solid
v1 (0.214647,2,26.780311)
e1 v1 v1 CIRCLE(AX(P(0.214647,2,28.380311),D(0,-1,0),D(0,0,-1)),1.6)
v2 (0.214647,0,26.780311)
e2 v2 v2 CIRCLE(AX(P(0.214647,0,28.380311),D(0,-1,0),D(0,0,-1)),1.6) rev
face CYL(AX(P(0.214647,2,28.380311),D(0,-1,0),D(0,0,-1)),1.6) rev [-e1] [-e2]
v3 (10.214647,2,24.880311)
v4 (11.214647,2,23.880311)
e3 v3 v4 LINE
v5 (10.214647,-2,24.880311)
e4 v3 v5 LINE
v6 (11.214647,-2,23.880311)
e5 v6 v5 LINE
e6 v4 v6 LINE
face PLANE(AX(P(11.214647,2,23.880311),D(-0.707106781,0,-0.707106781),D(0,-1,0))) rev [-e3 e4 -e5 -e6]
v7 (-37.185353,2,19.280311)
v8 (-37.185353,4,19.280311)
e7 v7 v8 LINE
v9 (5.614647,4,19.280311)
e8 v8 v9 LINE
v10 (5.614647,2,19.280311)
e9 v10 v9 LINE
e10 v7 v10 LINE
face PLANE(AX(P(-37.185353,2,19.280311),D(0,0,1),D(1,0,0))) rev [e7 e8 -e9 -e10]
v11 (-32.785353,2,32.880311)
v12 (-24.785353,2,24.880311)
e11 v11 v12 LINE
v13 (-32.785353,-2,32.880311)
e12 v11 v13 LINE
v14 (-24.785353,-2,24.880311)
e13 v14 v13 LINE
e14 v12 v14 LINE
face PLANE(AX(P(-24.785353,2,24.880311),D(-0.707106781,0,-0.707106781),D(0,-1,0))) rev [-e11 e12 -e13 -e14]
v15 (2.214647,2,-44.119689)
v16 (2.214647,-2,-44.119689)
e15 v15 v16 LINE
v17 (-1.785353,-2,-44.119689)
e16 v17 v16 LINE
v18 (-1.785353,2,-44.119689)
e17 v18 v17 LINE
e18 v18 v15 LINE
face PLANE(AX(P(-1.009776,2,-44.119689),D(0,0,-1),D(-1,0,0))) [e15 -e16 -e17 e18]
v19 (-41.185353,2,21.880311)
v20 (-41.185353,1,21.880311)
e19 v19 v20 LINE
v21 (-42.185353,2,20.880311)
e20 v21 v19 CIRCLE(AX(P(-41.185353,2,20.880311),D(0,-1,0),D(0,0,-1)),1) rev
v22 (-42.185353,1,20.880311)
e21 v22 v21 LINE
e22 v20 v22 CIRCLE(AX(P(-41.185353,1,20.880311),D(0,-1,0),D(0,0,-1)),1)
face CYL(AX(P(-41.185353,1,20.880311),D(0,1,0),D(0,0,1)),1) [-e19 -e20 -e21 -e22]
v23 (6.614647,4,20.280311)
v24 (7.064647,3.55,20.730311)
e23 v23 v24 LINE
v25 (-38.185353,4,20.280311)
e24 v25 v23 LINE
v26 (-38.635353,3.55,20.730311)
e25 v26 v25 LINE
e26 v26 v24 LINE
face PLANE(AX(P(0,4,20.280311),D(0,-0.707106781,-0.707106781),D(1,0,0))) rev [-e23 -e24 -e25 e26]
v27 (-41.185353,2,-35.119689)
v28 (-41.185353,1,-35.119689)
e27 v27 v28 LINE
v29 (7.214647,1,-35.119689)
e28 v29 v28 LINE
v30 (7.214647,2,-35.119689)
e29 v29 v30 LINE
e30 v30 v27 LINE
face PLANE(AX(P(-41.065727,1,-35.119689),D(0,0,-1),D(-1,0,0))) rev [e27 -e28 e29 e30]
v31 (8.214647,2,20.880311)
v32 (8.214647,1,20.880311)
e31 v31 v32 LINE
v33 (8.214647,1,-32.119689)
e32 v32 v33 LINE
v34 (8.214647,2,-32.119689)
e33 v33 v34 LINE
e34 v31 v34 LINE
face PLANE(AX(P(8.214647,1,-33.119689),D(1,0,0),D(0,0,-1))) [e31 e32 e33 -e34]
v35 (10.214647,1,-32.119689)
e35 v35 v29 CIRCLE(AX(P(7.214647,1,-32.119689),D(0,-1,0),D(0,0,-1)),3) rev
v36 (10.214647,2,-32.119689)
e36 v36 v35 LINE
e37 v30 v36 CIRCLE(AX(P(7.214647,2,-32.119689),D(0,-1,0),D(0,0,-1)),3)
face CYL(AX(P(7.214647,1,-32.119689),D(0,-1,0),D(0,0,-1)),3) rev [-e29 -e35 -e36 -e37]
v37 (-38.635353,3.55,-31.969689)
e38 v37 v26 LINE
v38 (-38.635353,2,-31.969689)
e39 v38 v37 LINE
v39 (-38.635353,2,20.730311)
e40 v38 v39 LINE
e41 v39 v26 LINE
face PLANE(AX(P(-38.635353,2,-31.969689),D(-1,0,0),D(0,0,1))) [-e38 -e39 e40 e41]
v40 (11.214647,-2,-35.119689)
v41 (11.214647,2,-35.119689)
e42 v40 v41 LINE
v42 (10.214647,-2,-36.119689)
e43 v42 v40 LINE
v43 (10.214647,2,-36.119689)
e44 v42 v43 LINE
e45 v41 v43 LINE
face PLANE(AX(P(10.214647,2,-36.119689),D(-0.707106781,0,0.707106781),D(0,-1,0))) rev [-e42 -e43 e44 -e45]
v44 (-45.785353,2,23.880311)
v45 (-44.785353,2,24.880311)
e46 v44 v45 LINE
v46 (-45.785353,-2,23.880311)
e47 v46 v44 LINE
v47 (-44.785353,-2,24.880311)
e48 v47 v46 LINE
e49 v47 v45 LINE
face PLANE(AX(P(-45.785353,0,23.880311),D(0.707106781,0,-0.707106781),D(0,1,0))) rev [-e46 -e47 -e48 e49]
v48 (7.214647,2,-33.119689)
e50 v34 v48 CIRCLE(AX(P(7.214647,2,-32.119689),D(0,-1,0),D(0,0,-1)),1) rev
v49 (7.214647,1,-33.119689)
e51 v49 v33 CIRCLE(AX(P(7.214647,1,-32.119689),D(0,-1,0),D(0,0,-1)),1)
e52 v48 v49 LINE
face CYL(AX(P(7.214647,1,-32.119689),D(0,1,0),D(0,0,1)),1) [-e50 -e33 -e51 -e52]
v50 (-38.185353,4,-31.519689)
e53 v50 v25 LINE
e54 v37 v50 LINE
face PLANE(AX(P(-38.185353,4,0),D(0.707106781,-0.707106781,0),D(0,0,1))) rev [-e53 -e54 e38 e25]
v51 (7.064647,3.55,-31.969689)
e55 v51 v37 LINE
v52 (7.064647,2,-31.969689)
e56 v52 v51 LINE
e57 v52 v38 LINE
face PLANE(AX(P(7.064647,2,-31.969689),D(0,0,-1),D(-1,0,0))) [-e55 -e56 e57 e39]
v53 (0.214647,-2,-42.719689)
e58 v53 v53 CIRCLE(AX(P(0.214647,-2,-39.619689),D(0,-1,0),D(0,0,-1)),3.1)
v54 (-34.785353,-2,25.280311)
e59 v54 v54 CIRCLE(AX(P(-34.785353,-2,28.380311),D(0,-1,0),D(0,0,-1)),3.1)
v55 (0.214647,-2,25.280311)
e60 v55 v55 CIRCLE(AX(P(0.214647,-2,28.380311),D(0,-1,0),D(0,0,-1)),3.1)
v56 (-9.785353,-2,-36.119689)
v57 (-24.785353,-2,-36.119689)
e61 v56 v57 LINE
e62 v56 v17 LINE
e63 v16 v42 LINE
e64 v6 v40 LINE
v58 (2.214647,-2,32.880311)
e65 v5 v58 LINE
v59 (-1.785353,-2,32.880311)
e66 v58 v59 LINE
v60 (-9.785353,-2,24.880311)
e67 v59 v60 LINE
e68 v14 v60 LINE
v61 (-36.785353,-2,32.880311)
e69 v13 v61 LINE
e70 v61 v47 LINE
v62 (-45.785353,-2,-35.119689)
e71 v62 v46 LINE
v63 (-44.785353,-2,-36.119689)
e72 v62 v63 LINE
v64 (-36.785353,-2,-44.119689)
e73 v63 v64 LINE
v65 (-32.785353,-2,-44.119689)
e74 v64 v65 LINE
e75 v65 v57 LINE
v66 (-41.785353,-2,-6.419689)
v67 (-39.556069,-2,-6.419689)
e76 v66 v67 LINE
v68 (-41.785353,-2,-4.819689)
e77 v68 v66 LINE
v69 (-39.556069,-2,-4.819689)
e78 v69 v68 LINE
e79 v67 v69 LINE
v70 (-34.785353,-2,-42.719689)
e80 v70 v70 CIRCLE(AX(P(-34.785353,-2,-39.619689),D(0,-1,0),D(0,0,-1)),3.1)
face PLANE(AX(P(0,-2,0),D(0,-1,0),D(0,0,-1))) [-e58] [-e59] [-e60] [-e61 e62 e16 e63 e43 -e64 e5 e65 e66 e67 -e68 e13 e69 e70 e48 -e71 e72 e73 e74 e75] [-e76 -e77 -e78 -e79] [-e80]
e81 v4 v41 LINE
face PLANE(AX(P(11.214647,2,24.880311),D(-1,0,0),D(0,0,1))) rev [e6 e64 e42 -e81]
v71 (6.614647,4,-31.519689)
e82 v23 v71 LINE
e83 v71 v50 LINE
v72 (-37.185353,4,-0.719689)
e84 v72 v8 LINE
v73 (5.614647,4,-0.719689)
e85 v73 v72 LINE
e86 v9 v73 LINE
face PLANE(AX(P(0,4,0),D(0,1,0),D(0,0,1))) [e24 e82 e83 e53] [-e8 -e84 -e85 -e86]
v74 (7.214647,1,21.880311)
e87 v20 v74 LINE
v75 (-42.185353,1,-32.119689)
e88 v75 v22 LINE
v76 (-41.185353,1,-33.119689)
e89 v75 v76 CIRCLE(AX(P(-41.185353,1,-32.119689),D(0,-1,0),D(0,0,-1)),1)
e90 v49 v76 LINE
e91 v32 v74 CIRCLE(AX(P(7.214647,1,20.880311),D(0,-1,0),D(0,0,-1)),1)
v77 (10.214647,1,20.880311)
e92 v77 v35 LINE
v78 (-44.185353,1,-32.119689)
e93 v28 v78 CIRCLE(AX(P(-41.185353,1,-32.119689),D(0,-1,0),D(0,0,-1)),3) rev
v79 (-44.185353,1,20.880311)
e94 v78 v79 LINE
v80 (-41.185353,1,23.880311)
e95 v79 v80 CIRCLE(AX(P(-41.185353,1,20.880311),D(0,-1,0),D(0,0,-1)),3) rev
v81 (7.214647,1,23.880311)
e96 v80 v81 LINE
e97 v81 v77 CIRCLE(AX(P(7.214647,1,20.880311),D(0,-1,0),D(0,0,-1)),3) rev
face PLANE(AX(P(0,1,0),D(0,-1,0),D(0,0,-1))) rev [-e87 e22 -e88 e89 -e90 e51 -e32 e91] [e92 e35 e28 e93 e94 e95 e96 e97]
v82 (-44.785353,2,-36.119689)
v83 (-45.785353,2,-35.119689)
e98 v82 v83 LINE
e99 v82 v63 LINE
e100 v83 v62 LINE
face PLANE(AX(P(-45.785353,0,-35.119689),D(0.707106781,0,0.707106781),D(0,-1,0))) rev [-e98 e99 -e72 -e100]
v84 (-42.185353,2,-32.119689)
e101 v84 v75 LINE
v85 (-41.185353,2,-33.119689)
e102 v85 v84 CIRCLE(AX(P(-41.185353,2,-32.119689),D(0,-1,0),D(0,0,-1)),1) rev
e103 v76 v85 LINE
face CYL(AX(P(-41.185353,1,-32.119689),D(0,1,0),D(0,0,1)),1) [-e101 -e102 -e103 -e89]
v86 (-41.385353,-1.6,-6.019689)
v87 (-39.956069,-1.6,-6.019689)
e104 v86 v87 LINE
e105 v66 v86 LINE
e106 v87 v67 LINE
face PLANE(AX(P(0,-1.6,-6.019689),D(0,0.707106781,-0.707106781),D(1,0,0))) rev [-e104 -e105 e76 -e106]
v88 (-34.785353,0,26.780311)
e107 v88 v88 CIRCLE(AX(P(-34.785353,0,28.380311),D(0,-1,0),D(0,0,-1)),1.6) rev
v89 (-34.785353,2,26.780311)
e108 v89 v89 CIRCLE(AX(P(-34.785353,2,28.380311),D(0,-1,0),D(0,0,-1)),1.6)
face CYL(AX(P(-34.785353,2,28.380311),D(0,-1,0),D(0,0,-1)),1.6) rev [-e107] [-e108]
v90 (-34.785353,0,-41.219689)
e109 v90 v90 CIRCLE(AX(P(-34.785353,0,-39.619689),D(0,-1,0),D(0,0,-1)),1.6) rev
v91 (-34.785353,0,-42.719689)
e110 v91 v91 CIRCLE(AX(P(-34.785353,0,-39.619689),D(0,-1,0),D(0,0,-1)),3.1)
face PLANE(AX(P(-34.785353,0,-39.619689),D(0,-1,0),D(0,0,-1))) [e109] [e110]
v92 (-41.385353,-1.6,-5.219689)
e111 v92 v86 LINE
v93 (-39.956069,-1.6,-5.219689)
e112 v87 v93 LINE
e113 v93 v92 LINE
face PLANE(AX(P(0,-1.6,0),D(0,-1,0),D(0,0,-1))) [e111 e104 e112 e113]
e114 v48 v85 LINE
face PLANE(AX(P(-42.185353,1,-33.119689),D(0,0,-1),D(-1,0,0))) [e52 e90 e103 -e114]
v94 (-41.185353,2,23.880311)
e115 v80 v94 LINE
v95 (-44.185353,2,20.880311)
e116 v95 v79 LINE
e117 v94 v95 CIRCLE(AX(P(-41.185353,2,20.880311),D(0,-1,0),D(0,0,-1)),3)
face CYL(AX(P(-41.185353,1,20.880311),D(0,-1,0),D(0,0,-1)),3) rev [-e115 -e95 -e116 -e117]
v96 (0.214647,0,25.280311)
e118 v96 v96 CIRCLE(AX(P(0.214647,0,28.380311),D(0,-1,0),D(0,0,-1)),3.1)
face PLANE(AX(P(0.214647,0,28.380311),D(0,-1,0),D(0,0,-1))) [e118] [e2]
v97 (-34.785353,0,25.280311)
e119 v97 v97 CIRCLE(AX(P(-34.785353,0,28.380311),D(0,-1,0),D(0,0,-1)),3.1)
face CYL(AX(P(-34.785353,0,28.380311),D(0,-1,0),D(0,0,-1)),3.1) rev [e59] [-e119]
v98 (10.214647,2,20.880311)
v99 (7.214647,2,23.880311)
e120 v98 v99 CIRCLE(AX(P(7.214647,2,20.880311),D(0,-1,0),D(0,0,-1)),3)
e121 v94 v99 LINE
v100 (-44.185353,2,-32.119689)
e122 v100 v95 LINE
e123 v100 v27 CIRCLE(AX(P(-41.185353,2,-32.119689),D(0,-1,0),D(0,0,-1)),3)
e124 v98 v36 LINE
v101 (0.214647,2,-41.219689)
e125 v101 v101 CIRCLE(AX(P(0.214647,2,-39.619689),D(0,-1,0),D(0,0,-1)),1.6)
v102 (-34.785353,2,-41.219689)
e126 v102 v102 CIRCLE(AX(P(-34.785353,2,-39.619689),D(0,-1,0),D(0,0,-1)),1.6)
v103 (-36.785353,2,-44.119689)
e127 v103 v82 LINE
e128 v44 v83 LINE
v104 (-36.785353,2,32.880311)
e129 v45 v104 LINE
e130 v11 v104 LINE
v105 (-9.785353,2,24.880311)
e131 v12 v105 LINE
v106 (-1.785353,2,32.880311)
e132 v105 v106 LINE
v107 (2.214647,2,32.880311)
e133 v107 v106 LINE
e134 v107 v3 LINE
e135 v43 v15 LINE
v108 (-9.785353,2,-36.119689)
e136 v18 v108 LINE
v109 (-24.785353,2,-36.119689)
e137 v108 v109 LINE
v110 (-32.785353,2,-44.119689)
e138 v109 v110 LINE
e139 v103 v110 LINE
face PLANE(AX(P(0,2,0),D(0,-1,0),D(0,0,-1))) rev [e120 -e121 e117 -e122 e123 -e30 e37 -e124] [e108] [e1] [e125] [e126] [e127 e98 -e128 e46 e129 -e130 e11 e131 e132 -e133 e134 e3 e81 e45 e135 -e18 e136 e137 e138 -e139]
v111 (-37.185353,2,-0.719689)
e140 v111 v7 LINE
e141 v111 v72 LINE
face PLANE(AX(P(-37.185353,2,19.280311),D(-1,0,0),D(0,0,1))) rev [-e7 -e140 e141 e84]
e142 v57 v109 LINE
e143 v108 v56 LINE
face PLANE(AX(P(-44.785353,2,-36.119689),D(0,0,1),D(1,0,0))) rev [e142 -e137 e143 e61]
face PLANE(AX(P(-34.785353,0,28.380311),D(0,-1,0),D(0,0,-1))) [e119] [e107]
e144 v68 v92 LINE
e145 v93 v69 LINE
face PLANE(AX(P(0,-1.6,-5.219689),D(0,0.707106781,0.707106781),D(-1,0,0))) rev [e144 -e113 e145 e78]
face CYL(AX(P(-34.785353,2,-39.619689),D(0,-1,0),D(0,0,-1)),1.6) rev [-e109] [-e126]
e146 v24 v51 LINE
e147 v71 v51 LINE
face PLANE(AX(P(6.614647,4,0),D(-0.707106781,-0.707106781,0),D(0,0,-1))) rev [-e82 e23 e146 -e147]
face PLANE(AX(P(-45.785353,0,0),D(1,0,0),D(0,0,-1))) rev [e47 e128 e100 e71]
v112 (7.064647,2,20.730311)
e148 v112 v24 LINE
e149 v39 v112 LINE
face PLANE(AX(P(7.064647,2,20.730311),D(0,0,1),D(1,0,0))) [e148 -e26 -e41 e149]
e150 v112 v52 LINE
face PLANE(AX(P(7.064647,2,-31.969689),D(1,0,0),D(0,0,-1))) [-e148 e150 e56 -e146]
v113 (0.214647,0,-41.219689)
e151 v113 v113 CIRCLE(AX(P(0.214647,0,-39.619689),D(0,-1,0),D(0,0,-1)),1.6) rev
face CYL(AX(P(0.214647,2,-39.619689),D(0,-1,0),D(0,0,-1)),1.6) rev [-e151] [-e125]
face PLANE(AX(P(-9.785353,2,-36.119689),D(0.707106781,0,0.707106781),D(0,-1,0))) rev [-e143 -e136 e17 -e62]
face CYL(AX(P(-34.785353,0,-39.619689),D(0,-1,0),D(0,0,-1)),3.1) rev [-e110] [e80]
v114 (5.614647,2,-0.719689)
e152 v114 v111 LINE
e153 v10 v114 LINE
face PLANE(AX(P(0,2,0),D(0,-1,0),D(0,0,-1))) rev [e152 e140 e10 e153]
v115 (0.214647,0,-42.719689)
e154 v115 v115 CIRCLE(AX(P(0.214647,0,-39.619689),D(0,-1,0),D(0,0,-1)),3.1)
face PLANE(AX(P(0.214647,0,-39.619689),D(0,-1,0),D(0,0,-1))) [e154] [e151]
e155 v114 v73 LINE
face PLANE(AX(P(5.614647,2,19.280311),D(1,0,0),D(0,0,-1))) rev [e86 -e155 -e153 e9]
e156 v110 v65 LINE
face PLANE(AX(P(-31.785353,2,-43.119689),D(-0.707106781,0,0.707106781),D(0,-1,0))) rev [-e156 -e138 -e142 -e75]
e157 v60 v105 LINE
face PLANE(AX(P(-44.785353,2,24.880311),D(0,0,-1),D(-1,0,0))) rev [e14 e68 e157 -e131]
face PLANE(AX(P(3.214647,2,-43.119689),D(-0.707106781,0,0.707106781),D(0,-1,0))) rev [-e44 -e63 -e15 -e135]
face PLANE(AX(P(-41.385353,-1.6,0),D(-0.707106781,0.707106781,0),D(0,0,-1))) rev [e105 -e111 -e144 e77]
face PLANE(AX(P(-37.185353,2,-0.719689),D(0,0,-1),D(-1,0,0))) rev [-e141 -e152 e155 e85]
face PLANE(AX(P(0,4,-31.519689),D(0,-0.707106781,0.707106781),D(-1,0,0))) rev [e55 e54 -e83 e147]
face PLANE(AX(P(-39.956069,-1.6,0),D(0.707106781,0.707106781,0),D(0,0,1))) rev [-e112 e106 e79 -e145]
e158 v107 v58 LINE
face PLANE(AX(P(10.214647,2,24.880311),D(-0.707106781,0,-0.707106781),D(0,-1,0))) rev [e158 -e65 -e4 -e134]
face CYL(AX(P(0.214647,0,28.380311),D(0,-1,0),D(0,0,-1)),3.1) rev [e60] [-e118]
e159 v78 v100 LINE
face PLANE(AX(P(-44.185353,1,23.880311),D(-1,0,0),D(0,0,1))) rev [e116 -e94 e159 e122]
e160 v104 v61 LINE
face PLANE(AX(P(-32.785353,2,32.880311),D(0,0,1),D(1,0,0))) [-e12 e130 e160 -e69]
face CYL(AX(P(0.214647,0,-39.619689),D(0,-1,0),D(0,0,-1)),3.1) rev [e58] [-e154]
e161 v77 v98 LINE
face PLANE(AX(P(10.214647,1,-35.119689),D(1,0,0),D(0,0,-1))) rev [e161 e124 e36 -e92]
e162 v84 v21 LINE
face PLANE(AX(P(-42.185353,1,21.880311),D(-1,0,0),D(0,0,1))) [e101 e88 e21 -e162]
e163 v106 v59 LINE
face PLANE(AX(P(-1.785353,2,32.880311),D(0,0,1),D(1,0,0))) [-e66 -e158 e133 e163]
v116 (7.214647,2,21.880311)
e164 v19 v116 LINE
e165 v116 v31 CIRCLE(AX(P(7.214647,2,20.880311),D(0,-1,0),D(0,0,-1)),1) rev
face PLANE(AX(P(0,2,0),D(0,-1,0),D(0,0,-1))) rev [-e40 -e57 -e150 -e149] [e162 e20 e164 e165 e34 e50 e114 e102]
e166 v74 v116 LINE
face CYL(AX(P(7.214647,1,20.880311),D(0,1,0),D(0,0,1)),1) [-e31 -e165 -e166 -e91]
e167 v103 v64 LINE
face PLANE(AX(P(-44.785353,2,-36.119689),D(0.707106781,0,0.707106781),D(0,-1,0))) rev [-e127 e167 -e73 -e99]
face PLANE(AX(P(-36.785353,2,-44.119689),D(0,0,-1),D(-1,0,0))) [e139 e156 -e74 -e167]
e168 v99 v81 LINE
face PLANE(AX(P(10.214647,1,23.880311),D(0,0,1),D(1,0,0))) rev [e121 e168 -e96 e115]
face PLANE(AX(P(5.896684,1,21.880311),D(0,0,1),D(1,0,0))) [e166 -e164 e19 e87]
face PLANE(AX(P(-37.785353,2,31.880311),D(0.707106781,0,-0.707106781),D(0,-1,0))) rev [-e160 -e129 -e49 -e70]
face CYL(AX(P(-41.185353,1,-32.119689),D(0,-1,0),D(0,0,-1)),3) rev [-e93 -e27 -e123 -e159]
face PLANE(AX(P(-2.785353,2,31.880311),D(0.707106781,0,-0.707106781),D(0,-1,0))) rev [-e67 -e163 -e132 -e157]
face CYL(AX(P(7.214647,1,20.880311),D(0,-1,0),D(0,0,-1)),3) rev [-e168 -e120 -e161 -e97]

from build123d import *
from build123d.topology import SkipClean

# Parameters (mm, degrees)
SKETCH2_W           = 56
SKETCH2_H           = 61
BOSS_EXTRUDE1_DEPTH = 2
SKETCH3_W           = 46
SKETCH3_H           = 53
BOSS_EXTRUDE4_DEPTH = 2
SKETCH4_W           = 61
SKETCH4_H           = 4
BOSS_EXTRUDE5_DEPTH = 1
SKETCH5_W           = 6
SKETCH5_H           = 7
SKETCH5_R           = 1.6
BOSS_EXTRUDE7_DEPTH = 4
CUT_EXTRUDE1_DEPTH  = 1
CHAMFER1_SIZE       = 7
CHAMFER2_SIZE       = 7
CHAMFER3_SIZE       = 7
SKETCH11_R          = 3.1
CUT_EXTRUDE3_DEPTH  = 2
CHAMFER5_SIZE       = 1
BOSS_EXTRUDE8_DEPTH = 4
SKETCH13_W          = 45.8
SKETCH13_H          = 52.8
CUT_EXTRUDE4_DEPTH  = 2
CHAMFER6_SIZE       = 0.5
SKETCH14_W          = 2.229283504
SKETCH14_H          = 1.6
CUT_EXTRUDE5_DEPTH  = 0.4
CHAMFER7_SIZE       = 0.4
SKETCH15_W          = 42.8
SKETCH15_H          = 20
CUT_EXTRUDE6_DEPTH  = 2
SKETCH17_W          = 105.377924995
SKETCH17_H          = 90.385080266
SKETCH17_W_2        = 45.7
SKETCH17_H_2        = 52.7
CUT_EXTRUDE7_DEPTH  = 2
FILLET1_R           = 3
FILLET2_R           = 1


with BuildPart() as part:
    # Sketch2 → Boss-Extrude1 (new, symmetric)
    with BuildSketch(Plane(origin=(0, 0, 0), x_dir=(1, 0, 0), z_dir=(0, 1, 0))):
        with Locations((-16.78535262, 5.61968945)):
            Rectangle(SKETCH2_W, SKETCH2_H)
    extrude(amount=BOSS_EXTRUDE1_DEPTH, both=True)

    # Sketch3 → Boss-Extrude4 (add)
    with BuildSketch(Plane(origin=(0, 2, 0), x_dir=(1, 0, 0), z_dir=(0, 1, 0))):
        with Locations((-15.78535262, 5.61968945)):
            Rectangle(SKETCH3_W, SKETCH3_H)
    extrude(amount=BOSS_EXTRUDE4_DEPTH)

    # Sketch4 → Boss-Extrude5 (add)
    with BuildSketch(Plane.ZY.offset(44.78535262)):
        with Locations((-5.61968945, 0)):
            Rectangle(SKETCH4_W, SKETCH4_H)
    extrude(amount=BOSS_EXTRUDE5_DEPTH)

    # Sketch5 → Boss-Extrude7 (add)
    # profile 1 of 4: a face of its own
    with BuildSketch(Plane.XZ.offset(2)):
        with Locations((0.21464738, -39.61968945)):
            Rectangle(SKETCH5_W, SKETCH5_H)
        with Locations(Location((0.21464738, -39.61968945, 0), (0, 0, 270))):
            Circle(SKETCH5_R, mode=Mode.SUBTRACT)
    # profile 2 of 4: a face of its own
    with BuildSketch(Plane.XZ.offset(2)):
        with Locations((-34.78535262, -39.61968945)):
            Rectangle(SKETCH5_W, SKETCH5_H)
        with Locations(Location((-34.78535262, -39.61968945, 0), (0, 0, 270))):
            Circle(SKETCH5_R, mode=Mode.SUBTRACT)
    # profile 3 of 4: a face of its own
    with BuildSketch(Plane.XZ.offset(2)):
        with Locations((0.21464738, 28.38031055)):
            Rectangle(SKETCH5_W, SKETCH5_H)
        with Locations(Location((0.21464738, 28.38031055, 0), (0, 0, 270))):
            Circle(SKETCH5_R, mode=Mode.SUBTRACT)
    # profile 4 of 4: a face of its own
    with BuildSketch(Plane.XZ.offset(2)):
        with Locations((-34.78535262, 28.38031055)):
            Rectangle(SKETCH5_W, SKETCH5_H)
        with Locations(Location((-34.78535262, 28.38031055, 0), (0, 0, 270))):
            Circle(SKETCH5_R, mode=Mode.SUBTRACT)
    extrude(amount=-BOSS_EXTRUDE7_DEPTH)

    # Sketch10 → Cut-Extrude1 (cut)
    with BuildSketch(Plane(origin=(0, 2, 0), x_dir=(1, 0, 0), z_dir=(0, 1, 0))):
        Polygon((6.144593809, -23.88031055), (7.179875028, -23.88031055), (10.21464738, -23.88031055), (10.21464738, 33.074495481), (10.21464738, 35.11968945), (-41.065727012, 35.11968945), (-44.18535262, 35.11968945), (-44.18535262, -21.426384345), (-44.18535262, -23.88031055), align=None)
        Polygon((5.896683614, -21.88031055), (-42.18535262, -21.88031055), (-42.18535262, 33.11968945), (8.21464738, 33.11968945), (8.21464738, -21.88031055), align=None, mode=Mode.SUBTRACT)
    extrude(amount=-CUT_EXTRUDE1_DEPTH, mode=Mode.SUBTRACT)

    # Chamfer1
    chamfer1_edges = [part.edges().sort_by_distance(p)[0] for p in [
        (3.21464738, 0, -36.11968945),
    ]]
    chamfer(chamfer1_edges, length=CHAMFER1_SIZE - 0.0001)  # a hair under: the kernel refuses the full size

    # Chamfer2
    chamfer2_edges = [part.edges().sort_by_distance(p)[0] for p in [
        (-2.78535262, 0, -36.11968945),
    ]]
    chamfer(chamfer2_edges, length=CHAMFER2_SIZE - 0.0001)  # a hair under: the kernel refuses the full size

    # Chamfer3
    chamfer3_edges = [part.edges().sort_by_distance(p)[0] for p in [
        (-37.78535262, 0, -36.11968945),
        (-31.78535262, 0, -36.11968945),
        (3.21464738, 0, 24.88031055),
        (-2.78535262, 0, 24.88031055),
        (-37.78535262, 0, 24.88031055),
        (-31.78535262, 0, 24.88031055),
    ]]
    chamfer(chamfer3_edges, length=CHAMFER3_SIZE - 0.0001)  # a hair under: the kernel refuses the full size

    # Sketch11 → Cut-Extrude3 (cut)
    with BuildSketch(Plane.XZ.offset(2)):
        with Locations(Location((-34.78535262, 28.38031055, 0), (0, 0, 270))):
            Circle(SKETCH11_R)
        with Locations(Location((0.21464738, 28.38031055, 0), (0, 0, 270))):
            Circle(SKETCH11_R)
        with Locations(Location((0.21464738, -39.61968945, 0), (0, 0, 270))):
            Circle(SKETCH11_R)
        with Locations(Location((-34.78535262, -39.61968945, 0), (0, 0, 270))):
            Circle(SKETCH11_R)
    extrude(amount=-CUT_EXTRUDE3_DEPTH, mode=Mode.SUBTRACT)

    # Chamfer5
    chamfer5_edges = [part.edges().sort_by_distance(p)[0] for p in [
        (-45.78535262, 0, -36.11968945),
        (-45.78535262, 0, 24.88031055),
        (11.21464738, 0, -36.11968945),
        (11.21464738, 0, 24.88031055),
    ]]
    chamfer(chamfer5_edges, length=CHAMFER5_SIZE)

    # Sketch12 → Boss-Extrude8 (add)
    with SkipClean():  # the faces are left unmerged after this step: merging them gives an invalid solid
        with BuildSketch(Plane.XZ.offset(2)):
            Polygon((-31.78535262, 31.88031055), (-32.78535262, 32.88031055), (-36.78535262, 32.88031055), (-37.78535262, 31.88031055), align=None)
            Polygon((3.21464738, 31.88031055), (2.21464738, 32.88031055), (-1.78535262, 32.88031055), (-2.78535262, 31.88031055), align=None)
            Polygon((-2.78535262, -43.11968945), (-1.78535262, -44.11968945), (-1.009776474, -44.11968945), (2.21464738, -44.11968945), (3.21464738, -43.11968945), align=None)
            Polygon((-31.78535262, -43.11968945), (-32.78535262, -44.11968945), (-36.78535262, -44.11968945), (-37.78535262, -43.11968945), align=None)
        extrude(amount=-BOSS_EXTRUDE8_DEPTH)

    # Sketch13 → Cut-Extrude4 (cut)
    with SkipClean():  # the faces are left unmerged after this step: merging them gives an invalid solid
        with BuildSketch(Plane(origin=(0, 4, 0), x_dir=(1, 0, 0), z_dir=(0, 1, 0))):
            Polygon((-38.78535262, -20.88031055), (-38.68535262, -20.88031055), (7.21464738, -20.88031055), (7.21464738, -20.78031055), (7.21464738, 32.01968945), (7.21464738, 32.11968945), (-38.68535262, 32.11968945), (-38.78535262, 32.11968945), align=None)
            with Locations((-15.78535262, 5.61968945)):
                Rectangle(SKETCH13_W, SKETCH13_H, mode=Mode.SUBTRACT)
        extrude(amount=-CUT_EXTRUDE4_DEPTH, mode=Mode.SUBTRACT)

    # Chamfer6
    chamfer6_edges = [part.edges().sort_by_distance(p)[0] for p in [
        (-15.78535262, 4, 20.78031055),
        (-38.68535262, 4, -5.61968945),
        (-15.78535262, 4, -32.01968945),
        (7.11464738, 4, -5.61968945),
    ]]
    chamfer(chamfer6_edges, length=CHAMFER6_SIZE)

    # Sketch14 → Cut-Extrude5 (cut)
    with SkipClean():  # the faces are left unmerged after this step: merging them gives an invalid solid
        with BuildSketch(Plane.XZ.offset(2)):
            with Locations((-40.670710868, -5.61968945)):
                Rectangle(SKETCH14_W, SKETCH14_H)
        extrude(amount=-CUT_EXTRUDE5_DEPTH, mode=Mode.SUBTRACT)

    # Chamfer7
    chamfer7_edges = [part.edges().sort_by_distance(p)[0] for p in [
        (-40.670710868, -1.6, -4.81968945),
        (-39.556069116, -1.6, -5.61968945),
        (-40.670710868, -1.6, -6.41968945),
        (-41.78535262, -1.6, -5.61968945),
    ]]
    chamfer(chamfer7_edges, length=CHAMFER7_SIZE - 0.0001)  # a hair under: the kernel refuses the full size

    # Sketch15 → Cut-Extrude6 (cut)
    with SkipClean():  # the faces are left unmerged after this step: merging them gives an invalid solid
        with BuildSketch(Plane(origin=(0, 4, 0), x_dir=(1, 0, 0), z_dir=(0, 1, 0))):
            with Locations((-15.78535262, -9.28031055)):
                Rectangle(SKETCH15_W, SKETCH15_H)
        extrude(amount=-CUT_EXTRUDE6_DEPTH, mode=Mode.SUBTRACT)

    # Sketch17 → Cut-Extrude7 (cut)
    with SkipClean():  # the faces are left unmerged after this step: merging them gives an invalid solid
        with BuildSketch(Plane(origin=(0, 4, 0), x_dir=(1, 0, 0), z_dir=(0, 1, 0))):
            with Locations((-12.998639351, 5.588523168)):
                Rectangle(SKETCH17_W, SKETCH17_H)
            with Locations((-15.78535262, 5.61968945)):
                Rectangle(SKETCH17_W_2, SKETCH17_H_2, mode=Mode.SUBTRACT)
        extrude(amount=-CUT_EXTRUDE7_DEPTH, mode=Mode.SUBTRACT)

    # Fillet1
    fillet1_edges = [part.edges().sort_by_distance(p)[0] for p in [
        (-44.18535262, 1.5, 23.88031055),
        (-44.18535262, 1.5, -35.11968945),
        (10.21464738, 1.5, -35.11968945),
        (10.21464738, 1.5, 23.88031055),
    ]]
    fillet(fillet1_edges, radius=FILLET1_R)

    # Fillet2
    fillet2_edges = [part.edges().sort_by_distance(p)[0] for p in [
        (-42.18535262, 1.5, 21.88031055),
        (-42.18535262, 1.5, -33.11968945),
        (8.21464738, 1.5, -33.11968945),
        (8.21464738, 1.5, 21.88031055),
    ]]
    fillet(fillet2_edges, radius=FILLET2_R)


solid = part.part
